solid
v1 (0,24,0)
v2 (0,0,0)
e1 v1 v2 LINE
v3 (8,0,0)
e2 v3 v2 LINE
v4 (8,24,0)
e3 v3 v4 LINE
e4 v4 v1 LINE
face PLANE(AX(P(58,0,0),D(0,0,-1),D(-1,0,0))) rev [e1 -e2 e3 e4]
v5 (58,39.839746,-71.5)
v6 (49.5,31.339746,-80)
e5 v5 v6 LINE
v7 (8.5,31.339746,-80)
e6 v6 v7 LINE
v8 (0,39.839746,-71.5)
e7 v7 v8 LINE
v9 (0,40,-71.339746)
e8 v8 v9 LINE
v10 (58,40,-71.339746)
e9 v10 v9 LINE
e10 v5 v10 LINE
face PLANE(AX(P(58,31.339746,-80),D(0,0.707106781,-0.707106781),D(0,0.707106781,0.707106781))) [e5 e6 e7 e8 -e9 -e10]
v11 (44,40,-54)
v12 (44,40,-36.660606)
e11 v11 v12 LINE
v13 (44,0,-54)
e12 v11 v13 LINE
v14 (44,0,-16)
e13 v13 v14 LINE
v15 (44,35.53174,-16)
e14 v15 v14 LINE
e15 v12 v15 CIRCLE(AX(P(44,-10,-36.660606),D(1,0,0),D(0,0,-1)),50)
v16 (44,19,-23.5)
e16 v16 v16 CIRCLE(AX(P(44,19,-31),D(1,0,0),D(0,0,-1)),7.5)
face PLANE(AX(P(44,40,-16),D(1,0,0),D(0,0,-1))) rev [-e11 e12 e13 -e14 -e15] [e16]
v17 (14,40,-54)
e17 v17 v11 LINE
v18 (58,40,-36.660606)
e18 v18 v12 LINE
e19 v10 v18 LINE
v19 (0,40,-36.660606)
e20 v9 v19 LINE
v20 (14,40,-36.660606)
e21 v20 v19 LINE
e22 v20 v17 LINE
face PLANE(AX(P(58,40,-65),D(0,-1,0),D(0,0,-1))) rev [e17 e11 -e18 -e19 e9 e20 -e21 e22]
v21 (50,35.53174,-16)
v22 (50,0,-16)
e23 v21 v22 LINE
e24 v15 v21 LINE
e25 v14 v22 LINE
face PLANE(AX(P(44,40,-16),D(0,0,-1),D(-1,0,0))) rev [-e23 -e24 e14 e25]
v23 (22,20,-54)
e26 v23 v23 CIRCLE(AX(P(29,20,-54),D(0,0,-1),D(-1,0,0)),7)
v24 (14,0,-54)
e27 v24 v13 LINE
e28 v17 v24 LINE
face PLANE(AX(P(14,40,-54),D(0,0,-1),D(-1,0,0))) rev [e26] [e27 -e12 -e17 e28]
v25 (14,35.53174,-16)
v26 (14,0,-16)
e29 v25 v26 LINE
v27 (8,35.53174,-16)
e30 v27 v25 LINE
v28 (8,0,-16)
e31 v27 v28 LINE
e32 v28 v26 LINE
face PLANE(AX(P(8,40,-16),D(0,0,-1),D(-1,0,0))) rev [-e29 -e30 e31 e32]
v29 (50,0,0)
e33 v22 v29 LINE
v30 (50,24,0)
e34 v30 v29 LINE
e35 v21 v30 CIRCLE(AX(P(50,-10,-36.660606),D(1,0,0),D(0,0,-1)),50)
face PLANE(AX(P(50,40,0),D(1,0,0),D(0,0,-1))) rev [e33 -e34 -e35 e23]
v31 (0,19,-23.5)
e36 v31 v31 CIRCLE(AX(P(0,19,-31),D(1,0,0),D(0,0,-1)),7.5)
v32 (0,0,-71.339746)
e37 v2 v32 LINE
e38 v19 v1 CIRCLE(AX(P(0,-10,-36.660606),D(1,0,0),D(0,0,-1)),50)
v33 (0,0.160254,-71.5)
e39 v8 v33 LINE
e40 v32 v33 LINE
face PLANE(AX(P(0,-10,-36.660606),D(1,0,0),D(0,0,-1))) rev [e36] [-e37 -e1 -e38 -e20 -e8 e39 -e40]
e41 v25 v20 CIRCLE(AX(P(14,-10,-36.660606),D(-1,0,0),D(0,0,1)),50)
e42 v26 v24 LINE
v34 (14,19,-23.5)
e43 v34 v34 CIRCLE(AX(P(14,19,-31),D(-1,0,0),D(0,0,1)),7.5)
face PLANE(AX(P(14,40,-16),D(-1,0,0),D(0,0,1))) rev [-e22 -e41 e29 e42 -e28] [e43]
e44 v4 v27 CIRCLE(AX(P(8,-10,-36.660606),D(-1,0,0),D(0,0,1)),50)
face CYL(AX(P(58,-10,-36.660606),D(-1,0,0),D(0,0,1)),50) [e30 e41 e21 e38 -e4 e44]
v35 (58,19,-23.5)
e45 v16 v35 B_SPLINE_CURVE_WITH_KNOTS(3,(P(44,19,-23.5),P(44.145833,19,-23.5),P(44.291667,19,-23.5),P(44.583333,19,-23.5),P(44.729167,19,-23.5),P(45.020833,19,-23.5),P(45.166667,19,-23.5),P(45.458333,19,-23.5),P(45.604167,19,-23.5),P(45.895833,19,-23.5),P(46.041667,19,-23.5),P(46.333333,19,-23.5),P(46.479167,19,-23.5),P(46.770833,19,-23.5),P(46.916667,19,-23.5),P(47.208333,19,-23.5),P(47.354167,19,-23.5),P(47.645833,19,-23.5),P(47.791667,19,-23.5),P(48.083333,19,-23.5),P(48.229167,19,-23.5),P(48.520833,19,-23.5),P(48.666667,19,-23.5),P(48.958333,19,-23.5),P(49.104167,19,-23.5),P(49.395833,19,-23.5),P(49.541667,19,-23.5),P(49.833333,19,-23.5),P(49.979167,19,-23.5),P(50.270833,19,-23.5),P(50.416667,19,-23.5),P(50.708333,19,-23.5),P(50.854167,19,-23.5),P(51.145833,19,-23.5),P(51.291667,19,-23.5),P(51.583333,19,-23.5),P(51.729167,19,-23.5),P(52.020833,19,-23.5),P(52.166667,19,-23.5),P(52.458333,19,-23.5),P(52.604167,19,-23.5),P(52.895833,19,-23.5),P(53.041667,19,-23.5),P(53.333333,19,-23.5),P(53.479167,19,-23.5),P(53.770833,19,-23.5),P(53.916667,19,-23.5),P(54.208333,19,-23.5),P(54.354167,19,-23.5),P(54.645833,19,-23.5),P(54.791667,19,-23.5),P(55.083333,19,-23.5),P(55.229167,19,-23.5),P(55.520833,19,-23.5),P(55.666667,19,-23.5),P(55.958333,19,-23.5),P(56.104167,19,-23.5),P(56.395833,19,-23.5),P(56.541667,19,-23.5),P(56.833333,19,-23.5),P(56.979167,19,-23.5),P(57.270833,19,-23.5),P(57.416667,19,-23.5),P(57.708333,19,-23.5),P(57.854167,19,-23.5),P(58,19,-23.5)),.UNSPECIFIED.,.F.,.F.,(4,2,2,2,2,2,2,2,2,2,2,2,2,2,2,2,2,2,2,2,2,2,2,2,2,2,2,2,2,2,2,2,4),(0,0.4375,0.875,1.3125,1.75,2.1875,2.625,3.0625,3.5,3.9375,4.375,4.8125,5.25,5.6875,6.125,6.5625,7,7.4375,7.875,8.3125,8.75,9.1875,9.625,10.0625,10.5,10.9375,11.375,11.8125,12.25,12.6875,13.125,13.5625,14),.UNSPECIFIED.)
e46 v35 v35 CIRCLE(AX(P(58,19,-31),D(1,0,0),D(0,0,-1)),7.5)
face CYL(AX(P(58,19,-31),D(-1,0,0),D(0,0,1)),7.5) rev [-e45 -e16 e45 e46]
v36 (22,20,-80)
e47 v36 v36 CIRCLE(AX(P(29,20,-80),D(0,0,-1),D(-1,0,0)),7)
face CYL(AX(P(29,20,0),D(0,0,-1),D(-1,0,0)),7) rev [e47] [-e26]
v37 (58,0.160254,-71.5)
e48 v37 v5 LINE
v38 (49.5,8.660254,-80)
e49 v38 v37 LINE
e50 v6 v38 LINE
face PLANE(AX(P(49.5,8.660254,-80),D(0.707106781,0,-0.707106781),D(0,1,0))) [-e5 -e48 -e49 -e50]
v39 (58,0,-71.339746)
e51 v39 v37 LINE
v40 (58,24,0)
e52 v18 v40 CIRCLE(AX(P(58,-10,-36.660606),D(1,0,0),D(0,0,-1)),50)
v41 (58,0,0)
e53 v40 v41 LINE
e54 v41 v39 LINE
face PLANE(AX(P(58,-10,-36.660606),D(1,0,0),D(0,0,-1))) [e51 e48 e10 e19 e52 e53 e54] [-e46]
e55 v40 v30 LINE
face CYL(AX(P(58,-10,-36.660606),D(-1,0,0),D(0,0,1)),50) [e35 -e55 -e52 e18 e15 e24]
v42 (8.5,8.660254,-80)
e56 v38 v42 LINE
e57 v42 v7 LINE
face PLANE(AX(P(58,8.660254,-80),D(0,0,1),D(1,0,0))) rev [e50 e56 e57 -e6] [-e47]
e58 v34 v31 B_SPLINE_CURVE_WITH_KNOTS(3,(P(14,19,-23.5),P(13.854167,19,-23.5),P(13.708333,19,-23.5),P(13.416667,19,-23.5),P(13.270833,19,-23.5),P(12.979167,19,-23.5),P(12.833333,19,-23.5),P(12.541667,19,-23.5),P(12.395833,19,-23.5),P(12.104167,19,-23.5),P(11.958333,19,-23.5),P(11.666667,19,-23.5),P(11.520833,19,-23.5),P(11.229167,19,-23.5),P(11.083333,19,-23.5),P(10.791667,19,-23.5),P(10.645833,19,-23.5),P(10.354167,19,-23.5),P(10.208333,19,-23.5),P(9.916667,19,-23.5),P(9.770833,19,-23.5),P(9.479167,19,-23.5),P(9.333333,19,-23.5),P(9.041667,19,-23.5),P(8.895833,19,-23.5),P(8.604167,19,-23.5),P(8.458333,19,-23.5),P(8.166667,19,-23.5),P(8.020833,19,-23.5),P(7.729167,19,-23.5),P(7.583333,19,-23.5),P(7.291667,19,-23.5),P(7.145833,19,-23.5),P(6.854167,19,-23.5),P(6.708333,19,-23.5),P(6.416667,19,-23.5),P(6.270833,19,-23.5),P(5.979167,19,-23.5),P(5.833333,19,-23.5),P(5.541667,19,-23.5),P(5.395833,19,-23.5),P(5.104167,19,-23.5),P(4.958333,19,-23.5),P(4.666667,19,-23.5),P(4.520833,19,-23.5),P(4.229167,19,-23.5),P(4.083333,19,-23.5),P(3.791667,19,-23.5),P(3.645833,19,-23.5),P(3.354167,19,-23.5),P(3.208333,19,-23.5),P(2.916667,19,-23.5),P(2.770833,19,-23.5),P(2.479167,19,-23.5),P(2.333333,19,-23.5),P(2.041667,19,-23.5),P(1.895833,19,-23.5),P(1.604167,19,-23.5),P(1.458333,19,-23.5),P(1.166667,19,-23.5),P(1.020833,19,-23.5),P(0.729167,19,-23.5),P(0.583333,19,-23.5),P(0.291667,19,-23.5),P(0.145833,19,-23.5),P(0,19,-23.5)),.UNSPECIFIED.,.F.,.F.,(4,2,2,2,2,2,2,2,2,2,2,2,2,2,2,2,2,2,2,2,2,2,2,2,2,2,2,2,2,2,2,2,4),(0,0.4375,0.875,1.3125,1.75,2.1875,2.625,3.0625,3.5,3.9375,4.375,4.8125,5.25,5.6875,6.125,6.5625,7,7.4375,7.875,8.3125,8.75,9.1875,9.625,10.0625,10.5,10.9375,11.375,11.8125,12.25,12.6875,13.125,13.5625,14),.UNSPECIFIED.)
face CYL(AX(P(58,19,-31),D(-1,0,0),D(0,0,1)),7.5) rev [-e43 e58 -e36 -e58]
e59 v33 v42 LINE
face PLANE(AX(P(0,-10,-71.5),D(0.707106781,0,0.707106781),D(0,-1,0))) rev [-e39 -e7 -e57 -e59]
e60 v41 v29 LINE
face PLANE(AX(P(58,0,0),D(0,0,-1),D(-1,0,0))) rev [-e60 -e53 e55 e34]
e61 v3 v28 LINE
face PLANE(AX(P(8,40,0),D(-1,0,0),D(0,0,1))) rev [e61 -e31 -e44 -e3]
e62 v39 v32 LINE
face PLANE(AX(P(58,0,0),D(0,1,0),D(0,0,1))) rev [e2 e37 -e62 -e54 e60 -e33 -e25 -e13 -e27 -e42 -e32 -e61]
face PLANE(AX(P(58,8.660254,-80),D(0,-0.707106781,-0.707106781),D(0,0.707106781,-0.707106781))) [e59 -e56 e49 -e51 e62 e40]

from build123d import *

# Parameters (mm, degrees)
SKETCH2_R           = 7.5
BOSS_EXTRUDE1_DEPTH = 58
CUT_EXTRUDE1_DEPTH  = 107.60206377
DRAFT2_ANGLE        = 45
SKETCH6_R           = 7
CUT_EXTRUDE6_DEPTH  = 107.60206377
CHAMFER9_SIZE       = 8.5
CHAMFER10_SIZE      = 8.5


with BuildPart() as part:
    # Sketch2 → Boss-Extrude1 (new body)
    with BuildSketch(Plane(origin=(0, 0, 0), x_dir=(0, 0, -1), z_dir=(1, 0, 0))):
        with BuildLine():
            Line((0, 0), (0, 24))
            ThreePointArc((0, 24), (16.66060556, 35.82575695), (36.66060556, 40))
            Line((36.66060556, 40), (65, 40))
            Line((65, 40), (80, 31.339745962))
            Line((80, 31.339745962), (80, 8.660254038))
            Line((80, 8.660254038), (65, 0))
            Line((65, 0), (0, 0))
        make_face()
        with Locations((31, 19)):
            Circle(SKETCH2_R, mode=Mode.SUBTRACT)
    extrude(amount=BOSS_EXTRUDE1_DEPTH)

    # Sketch4 → Cut-Extrude1 (cut, through all)
    with BuildSketch(Plane.XZ):
        Polygon((8, 0), (50, 0), (50, -16), (44, -16), (44, -54), (14, -54), (14, -16), (8, -16), align=None)
    extrude(amount=-CUT_EXTRUDE1_DEPTH, mode=Mode.SUBTRACT)

    # Draft2
    draft2_faces = [part.faces().sort_by_distance(p)[0] for p in [
        (29, 4.330127019, -72.5),
        (29, 35.669872981, -72.5),
    ]]
    draft(draft2_faces, Plane(origin=(58, 8.660254038, -80), x_dir=(-1, 0, 0), z_dir=(0, 0, -1)), DRAFT2_ANGLE)

    # Sketch6 → Cut-Extrude6 (cut, through all)
    with BuildSketch(Plane(origin=(0, 0, -80), x_dir=(-1, 0, 0), z_dir=(0, 0, -1))):
        with Locations((-29, 20)):
            Circle(SKETCH6_R)
    extrude(amount=-CUT_EXTRUDE6_DEPTH, mode=Mode.SUBTRACT)

    # Chamfer9
    chamfer9_edges = [part.edges().sort_by_distance(p)[0] for p in [
        (58, 20, -80),
    ]]
    chamfer(chamfer9_edges, length=CHAMFER9_SIZE)

    # Chamfer10
    chamfer10_edges = [part.edges().sort_by_distance(p)[0] for p in [
        (0, 20, -80),
    ]]
    chamfer(chamfer10_edges, length=CHAMFER10_SIZE)


solid = part.part
